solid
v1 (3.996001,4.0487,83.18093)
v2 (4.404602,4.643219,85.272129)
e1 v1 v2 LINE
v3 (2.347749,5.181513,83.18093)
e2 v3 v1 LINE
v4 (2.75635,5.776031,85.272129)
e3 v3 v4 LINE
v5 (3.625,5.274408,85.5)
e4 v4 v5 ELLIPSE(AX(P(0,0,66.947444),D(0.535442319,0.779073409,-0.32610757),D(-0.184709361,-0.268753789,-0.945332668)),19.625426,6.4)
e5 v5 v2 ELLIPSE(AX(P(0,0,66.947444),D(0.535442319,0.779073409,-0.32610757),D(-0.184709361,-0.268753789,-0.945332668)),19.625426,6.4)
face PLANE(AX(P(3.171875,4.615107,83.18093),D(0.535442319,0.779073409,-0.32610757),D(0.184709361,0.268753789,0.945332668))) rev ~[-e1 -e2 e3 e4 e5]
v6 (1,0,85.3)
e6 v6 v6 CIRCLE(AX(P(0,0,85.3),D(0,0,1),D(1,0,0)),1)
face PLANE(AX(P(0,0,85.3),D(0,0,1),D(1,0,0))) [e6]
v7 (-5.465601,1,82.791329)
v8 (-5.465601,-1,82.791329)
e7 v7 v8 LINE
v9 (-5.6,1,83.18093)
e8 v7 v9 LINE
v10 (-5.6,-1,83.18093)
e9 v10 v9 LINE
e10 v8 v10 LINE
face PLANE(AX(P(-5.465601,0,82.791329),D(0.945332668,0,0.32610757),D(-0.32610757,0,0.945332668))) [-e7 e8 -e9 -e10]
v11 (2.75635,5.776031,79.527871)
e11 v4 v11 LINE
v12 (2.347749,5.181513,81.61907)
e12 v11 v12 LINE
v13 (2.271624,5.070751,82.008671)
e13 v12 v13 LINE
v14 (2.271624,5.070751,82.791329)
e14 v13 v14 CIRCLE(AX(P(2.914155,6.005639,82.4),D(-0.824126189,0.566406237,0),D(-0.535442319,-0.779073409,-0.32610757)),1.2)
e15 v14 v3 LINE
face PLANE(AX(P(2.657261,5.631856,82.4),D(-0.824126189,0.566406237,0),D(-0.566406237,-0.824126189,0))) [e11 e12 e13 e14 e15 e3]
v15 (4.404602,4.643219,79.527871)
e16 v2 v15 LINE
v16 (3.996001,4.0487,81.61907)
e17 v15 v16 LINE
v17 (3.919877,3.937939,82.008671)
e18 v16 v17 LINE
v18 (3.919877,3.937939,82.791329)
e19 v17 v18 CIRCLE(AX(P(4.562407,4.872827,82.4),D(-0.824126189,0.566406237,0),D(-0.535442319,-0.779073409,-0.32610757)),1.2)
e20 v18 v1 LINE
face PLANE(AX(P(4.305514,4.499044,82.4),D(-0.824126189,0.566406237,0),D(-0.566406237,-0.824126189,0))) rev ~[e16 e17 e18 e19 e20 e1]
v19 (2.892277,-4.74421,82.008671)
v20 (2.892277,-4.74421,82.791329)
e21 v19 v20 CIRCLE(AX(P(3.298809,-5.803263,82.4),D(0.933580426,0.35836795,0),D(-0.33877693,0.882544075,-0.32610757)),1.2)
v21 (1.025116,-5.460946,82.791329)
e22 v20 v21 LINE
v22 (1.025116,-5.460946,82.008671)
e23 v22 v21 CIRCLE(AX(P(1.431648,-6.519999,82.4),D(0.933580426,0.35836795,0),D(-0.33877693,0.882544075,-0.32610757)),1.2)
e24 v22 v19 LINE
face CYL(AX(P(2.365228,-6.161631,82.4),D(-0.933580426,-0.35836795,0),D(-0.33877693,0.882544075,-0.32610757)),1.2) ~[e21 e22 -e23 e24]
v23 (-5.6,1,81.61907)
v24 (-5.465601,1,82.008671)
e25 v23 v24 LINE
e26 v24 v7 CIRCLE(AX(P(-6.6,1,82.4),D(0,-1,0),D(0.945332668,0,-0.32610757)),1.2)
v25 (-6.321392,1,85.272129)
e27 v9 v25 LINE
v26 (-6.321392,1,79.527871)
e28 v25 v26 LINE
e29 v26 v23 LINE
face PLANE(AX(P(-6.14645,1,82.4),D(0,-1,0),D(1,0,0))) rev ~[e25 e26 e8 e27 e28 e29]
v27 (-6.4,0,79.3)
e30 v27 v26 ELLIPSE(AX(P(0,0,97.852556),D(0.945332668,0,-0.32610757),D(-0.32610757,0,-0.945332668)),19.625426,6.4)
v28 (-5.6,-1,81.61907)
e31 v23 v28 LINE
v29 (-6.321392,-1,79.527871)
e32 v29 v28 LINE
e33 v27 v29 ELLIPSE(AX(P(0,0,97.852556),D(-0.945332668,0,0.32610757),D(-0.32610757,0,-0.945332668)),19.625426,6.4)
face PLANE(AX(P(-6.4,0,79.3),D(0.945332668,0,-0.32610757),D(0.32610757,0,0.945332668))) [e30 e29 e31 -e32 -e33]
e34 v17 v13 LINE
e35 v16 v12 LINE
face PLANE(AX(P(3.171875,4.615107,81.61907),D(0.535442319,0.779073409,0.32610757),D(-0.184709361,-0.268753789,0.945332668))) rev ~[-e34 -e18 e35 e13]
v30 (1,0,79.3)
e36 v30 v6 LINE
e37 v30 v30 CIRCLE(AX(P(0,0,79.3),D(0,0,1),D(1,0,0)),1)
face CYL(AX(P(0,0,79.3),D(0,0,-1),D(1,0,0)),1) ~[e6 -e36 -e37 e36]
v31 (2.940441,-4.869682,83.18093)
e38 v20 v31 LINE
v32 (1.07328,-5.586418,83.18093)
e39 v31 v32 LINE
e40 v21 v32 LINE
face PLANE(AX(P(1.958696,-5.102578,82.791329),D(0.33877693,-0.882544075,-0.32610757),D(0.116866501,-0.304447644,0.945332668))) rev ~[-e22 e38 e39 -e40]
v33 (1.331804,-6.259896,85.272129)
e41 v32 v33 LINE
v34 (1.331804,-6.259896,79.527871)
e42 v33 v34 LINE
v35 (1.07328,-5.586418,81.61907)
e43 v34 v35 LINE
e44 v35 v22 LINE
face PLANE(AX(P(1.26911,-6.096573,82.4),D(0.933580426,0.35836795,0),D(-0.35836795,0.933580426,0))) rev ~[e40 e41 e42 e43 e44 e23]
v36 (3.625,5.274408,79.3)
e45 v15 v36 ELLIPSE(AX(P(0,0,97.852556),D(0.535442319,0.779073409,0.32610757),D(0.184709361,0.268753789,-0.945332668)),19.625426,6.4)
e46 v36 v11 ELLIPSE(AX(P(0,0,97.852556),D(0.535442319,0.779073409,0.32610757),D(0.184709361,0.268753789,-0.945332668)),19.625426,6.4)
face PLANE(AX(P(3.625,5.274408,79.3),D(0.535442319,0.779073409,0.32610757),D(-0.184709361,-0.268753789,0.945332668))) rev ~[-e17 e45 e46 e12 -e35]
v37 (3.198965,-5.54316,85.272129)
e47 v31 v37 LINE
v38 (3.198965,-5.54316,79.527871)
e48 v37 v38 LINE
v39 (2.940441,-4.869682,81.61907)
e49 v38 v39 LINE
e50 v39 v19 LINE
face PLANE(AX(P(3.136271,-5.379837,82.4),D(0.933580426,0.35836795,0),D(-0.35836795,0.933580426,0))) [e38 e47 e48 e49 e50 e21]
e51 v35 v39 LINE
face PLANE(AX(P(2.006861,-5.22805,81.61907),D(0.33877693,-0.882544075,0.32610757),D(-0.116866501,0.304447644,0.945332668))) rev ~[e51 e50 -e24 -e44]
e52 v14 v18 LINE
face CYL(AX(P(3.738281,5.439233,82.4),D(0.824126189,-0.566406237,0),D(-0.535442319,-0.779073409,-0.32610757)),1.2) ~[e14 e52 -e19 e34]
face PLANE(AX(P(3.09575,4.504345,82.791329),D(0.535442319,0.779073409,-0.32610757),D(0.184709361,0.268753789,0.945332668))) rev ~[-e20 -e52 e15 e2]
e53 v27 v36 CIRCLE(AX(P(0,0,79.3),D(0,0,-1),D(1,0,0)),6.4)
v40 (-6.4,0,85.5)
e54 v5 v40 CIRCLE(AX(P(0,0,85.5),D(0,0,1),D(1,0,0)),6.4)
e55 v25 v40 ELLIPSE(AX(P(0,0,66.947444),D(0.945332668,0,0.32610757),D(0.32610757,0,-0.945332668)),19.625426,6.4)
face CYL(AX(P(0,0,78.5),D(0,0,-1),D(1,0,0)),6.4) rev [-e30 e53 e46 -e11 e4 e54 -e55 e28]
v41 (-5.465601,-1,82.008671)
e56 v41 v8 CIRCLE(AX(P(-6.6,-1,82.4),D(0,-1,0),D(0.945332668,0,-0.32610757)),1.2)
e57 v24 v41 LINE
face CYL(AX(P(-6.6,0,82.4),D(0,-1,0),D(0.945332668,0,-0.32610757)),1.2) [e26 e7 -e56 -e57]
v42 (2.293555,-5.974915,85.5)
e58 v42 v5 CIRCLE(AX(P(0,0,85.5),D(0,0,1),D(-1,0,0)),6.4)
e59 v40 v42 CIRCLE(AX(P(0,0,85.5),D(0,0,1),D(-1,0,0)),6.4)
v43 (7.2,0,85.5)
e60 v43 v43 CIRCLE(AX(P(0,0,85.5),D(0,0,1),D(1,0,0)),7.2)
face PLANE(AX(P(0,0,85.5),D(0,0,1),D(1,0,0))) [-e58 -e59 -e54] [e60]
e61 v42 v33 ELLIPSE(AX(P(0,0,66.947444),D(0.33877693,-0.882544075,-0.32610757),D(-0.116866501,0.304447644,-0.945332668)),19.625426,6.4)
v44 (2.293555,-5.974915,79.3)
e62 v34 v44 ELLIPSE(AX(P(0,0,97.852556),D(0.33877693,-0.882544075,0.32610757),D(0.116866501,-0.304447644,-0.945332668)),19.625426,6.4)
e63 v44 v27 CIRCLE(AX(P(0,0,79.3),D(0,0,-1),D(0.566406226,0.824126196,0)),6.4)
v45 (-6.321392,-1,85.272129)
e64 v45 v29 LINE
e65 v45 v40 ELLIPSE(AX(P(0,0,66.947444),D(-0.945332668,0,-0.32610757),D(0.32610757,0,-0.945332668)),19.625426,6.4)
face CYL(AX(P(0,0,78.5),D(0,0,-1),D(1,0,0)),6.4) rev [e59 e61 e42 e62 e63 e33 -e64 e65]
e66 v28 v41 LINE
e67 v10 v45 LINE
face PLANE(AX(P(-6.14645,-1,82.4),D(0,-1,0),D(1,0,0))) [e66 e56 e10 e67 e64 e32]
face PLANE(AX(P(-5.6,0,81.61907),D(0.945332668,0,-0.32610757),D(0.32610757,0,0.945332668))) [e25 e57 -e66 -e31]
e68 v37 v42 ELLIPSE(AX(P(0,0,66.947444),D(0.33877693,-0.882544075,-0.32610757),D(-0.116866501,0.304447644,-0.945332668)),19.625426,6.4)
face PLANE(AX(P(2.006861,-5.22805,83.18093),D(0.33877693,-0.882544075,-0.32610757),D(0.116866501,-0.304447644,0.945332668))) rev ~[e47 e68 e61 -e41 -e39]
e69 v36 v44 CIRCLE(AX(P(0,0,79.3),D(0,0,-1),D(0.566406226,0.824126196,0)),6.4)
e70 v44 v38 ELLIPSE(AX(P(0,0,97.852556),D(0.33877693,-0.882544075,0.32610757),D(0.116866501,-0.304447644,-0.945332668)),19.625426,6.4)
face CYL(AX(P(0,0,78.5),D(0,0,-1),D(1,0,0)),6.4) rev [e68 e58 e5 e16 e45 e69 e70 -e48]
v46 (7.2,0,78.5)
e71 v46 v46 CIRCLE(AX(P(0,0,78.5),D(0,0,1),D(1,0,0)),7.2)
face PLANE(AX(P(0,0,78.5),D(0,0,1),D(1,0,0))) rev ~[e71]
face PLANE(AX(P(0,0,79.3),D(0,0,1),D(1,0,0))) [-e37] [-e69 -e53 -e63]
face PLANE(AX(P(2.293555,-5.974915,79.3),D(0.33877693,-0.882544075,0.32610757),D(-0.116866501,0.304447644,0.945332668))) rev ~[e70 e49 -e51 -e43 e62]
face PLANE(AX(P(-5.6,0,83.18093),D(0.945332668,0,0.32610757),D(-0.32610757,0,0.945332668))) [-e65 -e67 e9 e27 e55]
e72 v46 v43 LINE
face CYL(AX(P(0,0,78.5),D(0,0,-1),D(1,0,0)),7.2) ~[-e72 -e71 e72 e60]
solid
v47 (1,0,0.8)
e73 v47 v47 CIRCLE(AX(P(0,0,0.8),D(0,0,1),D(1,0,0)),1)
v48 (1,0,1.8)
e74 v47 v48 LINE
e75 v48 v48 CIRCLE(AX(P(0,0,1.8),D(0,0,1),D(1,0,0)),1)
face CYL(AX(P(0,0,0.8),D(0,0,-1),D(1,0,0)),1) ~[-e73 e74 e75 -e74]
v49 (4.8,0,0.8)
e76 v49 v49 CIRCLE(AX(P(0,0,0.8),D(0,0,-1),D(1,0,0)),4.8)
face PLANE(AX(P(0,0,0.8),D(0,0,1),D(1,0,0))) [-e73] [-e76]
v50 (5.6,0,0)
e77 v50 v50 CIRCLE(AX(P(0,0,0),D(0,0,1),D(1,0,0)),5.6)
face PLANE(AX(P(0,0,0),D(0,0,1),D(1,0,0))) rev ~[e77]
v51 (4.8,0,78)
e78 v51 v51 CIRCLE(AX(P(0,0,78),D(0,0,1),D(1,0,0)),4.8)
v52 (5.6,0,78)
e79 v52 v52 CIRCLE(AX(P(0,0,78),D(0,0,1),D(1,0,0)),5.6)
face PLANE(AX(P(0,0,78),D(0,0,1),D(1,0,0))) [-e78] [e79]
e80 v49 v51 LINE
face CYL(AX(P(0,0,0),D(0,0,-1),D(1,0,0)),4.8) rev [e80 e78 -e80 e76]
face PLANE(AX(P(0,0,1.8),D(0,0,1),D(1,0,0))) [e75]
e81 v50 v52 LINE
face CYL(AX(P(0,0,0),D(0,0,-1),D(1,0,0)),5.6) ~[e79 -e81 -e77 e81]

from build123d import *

# Parameters (mm, degrees)
F0_R             = 5.6
F1_DEPTH         = 78
F2_T             = -0.8
F3_R             = 1
F4_DEPTH         = 1
F6_R             = 7.2
F7_DEPTH         = 7
F8_T             = -0.8
F10_DEPTH        = 1
F10_DEPTH_BACK   = 1
F10_COPIES_COUNT = 3
F10_COPIES_ANGLE = 249
F11_R            = 1
F12_DEPTH        = 6


# Not quite as in the source:
# - a pattern or mirror of a feature is missing from the dataset's text; its kind, count and spacing are read off the source's solid


with BuildPart() as f1:
    # F0 (on Top) → F1 (new body)
    with BuildSketch(Plane.XY):
        Circle(F0_R)
    extrude(amount=F1_DEPTH)

    # F2
    f2_openings = [f1.faces().sort_by_distance(p)[0] for p in [
        (0, 0, 78),
    ]]
    offset(amount=F2_T, openings=f2_openings)

    # F3 (on face) → F4 (join)
    with BuildSketch(Plane.XY.offset(0.8)):
        Circle(F3_R)
    extrude(amount=F4_DEPTH)


with BuildPart() as f7:
    # F6 (on offset) → F7 (new body)
    with BuildSketch(Plane.XY.offset(78.5)):
        Circle(F6_R)
    extrude(amount=F7_DEPTH)

    # F8
    f8_openings = [f7.faces().sort_by_distance(p)[0] for p in [
        (0, 0, 85.5),
    ]]
    offset(amount=F8_T, openings=f8_openings)

    # F9 (on Front) → F10 (join, two sides)
    with BuildSketch(Plane.XZ) as f10_sk:
        Polygon((-6.4, 85.5), (-6.4, 79.3), (-5.6, 81.6190695472), (-5.6, 83.1809304528), align=None)
        with BuildLine():
            Line((-5.6, 83.1809304528), (-5.6, 81.6190695472))
            Line((-5.6, 81.6190695472), (-5.4656007986, 82.0086709162))
            ThreePointArc((-5.4656007986, 82.0086709162), (-5.4, 82.4), (-5.4656007986, 82.7913290838))
            Line((-5.4656007986, 82.7913290838), (-5.6, 83.1809304528))
        make_face()
    f10 = extrude(amount=F10_DEPTH) + extrude(f10_sk.sketch, amount=-F10_DEPTH_BACK)

    # F10_copies: F10 ×3 about axis
    f10_copies_axis = Axis((0, 0, 0), (0, 0, -1))
    for i in range(1, F10_COPIES_COUNT):
        add(f10.rotate(f10_copies_axis, i * F10_COPIES_ANGLE / (F10_COPIES_COUNT - 1)))

    # F11 (on face) → F12 (join)
    with BuildSketch(Plane.XY.offset(79.3)):
        Circle(F11_R)
    extrude(amount=F12_DEPTH)


solid = Compound([f1.part, f7.part])
